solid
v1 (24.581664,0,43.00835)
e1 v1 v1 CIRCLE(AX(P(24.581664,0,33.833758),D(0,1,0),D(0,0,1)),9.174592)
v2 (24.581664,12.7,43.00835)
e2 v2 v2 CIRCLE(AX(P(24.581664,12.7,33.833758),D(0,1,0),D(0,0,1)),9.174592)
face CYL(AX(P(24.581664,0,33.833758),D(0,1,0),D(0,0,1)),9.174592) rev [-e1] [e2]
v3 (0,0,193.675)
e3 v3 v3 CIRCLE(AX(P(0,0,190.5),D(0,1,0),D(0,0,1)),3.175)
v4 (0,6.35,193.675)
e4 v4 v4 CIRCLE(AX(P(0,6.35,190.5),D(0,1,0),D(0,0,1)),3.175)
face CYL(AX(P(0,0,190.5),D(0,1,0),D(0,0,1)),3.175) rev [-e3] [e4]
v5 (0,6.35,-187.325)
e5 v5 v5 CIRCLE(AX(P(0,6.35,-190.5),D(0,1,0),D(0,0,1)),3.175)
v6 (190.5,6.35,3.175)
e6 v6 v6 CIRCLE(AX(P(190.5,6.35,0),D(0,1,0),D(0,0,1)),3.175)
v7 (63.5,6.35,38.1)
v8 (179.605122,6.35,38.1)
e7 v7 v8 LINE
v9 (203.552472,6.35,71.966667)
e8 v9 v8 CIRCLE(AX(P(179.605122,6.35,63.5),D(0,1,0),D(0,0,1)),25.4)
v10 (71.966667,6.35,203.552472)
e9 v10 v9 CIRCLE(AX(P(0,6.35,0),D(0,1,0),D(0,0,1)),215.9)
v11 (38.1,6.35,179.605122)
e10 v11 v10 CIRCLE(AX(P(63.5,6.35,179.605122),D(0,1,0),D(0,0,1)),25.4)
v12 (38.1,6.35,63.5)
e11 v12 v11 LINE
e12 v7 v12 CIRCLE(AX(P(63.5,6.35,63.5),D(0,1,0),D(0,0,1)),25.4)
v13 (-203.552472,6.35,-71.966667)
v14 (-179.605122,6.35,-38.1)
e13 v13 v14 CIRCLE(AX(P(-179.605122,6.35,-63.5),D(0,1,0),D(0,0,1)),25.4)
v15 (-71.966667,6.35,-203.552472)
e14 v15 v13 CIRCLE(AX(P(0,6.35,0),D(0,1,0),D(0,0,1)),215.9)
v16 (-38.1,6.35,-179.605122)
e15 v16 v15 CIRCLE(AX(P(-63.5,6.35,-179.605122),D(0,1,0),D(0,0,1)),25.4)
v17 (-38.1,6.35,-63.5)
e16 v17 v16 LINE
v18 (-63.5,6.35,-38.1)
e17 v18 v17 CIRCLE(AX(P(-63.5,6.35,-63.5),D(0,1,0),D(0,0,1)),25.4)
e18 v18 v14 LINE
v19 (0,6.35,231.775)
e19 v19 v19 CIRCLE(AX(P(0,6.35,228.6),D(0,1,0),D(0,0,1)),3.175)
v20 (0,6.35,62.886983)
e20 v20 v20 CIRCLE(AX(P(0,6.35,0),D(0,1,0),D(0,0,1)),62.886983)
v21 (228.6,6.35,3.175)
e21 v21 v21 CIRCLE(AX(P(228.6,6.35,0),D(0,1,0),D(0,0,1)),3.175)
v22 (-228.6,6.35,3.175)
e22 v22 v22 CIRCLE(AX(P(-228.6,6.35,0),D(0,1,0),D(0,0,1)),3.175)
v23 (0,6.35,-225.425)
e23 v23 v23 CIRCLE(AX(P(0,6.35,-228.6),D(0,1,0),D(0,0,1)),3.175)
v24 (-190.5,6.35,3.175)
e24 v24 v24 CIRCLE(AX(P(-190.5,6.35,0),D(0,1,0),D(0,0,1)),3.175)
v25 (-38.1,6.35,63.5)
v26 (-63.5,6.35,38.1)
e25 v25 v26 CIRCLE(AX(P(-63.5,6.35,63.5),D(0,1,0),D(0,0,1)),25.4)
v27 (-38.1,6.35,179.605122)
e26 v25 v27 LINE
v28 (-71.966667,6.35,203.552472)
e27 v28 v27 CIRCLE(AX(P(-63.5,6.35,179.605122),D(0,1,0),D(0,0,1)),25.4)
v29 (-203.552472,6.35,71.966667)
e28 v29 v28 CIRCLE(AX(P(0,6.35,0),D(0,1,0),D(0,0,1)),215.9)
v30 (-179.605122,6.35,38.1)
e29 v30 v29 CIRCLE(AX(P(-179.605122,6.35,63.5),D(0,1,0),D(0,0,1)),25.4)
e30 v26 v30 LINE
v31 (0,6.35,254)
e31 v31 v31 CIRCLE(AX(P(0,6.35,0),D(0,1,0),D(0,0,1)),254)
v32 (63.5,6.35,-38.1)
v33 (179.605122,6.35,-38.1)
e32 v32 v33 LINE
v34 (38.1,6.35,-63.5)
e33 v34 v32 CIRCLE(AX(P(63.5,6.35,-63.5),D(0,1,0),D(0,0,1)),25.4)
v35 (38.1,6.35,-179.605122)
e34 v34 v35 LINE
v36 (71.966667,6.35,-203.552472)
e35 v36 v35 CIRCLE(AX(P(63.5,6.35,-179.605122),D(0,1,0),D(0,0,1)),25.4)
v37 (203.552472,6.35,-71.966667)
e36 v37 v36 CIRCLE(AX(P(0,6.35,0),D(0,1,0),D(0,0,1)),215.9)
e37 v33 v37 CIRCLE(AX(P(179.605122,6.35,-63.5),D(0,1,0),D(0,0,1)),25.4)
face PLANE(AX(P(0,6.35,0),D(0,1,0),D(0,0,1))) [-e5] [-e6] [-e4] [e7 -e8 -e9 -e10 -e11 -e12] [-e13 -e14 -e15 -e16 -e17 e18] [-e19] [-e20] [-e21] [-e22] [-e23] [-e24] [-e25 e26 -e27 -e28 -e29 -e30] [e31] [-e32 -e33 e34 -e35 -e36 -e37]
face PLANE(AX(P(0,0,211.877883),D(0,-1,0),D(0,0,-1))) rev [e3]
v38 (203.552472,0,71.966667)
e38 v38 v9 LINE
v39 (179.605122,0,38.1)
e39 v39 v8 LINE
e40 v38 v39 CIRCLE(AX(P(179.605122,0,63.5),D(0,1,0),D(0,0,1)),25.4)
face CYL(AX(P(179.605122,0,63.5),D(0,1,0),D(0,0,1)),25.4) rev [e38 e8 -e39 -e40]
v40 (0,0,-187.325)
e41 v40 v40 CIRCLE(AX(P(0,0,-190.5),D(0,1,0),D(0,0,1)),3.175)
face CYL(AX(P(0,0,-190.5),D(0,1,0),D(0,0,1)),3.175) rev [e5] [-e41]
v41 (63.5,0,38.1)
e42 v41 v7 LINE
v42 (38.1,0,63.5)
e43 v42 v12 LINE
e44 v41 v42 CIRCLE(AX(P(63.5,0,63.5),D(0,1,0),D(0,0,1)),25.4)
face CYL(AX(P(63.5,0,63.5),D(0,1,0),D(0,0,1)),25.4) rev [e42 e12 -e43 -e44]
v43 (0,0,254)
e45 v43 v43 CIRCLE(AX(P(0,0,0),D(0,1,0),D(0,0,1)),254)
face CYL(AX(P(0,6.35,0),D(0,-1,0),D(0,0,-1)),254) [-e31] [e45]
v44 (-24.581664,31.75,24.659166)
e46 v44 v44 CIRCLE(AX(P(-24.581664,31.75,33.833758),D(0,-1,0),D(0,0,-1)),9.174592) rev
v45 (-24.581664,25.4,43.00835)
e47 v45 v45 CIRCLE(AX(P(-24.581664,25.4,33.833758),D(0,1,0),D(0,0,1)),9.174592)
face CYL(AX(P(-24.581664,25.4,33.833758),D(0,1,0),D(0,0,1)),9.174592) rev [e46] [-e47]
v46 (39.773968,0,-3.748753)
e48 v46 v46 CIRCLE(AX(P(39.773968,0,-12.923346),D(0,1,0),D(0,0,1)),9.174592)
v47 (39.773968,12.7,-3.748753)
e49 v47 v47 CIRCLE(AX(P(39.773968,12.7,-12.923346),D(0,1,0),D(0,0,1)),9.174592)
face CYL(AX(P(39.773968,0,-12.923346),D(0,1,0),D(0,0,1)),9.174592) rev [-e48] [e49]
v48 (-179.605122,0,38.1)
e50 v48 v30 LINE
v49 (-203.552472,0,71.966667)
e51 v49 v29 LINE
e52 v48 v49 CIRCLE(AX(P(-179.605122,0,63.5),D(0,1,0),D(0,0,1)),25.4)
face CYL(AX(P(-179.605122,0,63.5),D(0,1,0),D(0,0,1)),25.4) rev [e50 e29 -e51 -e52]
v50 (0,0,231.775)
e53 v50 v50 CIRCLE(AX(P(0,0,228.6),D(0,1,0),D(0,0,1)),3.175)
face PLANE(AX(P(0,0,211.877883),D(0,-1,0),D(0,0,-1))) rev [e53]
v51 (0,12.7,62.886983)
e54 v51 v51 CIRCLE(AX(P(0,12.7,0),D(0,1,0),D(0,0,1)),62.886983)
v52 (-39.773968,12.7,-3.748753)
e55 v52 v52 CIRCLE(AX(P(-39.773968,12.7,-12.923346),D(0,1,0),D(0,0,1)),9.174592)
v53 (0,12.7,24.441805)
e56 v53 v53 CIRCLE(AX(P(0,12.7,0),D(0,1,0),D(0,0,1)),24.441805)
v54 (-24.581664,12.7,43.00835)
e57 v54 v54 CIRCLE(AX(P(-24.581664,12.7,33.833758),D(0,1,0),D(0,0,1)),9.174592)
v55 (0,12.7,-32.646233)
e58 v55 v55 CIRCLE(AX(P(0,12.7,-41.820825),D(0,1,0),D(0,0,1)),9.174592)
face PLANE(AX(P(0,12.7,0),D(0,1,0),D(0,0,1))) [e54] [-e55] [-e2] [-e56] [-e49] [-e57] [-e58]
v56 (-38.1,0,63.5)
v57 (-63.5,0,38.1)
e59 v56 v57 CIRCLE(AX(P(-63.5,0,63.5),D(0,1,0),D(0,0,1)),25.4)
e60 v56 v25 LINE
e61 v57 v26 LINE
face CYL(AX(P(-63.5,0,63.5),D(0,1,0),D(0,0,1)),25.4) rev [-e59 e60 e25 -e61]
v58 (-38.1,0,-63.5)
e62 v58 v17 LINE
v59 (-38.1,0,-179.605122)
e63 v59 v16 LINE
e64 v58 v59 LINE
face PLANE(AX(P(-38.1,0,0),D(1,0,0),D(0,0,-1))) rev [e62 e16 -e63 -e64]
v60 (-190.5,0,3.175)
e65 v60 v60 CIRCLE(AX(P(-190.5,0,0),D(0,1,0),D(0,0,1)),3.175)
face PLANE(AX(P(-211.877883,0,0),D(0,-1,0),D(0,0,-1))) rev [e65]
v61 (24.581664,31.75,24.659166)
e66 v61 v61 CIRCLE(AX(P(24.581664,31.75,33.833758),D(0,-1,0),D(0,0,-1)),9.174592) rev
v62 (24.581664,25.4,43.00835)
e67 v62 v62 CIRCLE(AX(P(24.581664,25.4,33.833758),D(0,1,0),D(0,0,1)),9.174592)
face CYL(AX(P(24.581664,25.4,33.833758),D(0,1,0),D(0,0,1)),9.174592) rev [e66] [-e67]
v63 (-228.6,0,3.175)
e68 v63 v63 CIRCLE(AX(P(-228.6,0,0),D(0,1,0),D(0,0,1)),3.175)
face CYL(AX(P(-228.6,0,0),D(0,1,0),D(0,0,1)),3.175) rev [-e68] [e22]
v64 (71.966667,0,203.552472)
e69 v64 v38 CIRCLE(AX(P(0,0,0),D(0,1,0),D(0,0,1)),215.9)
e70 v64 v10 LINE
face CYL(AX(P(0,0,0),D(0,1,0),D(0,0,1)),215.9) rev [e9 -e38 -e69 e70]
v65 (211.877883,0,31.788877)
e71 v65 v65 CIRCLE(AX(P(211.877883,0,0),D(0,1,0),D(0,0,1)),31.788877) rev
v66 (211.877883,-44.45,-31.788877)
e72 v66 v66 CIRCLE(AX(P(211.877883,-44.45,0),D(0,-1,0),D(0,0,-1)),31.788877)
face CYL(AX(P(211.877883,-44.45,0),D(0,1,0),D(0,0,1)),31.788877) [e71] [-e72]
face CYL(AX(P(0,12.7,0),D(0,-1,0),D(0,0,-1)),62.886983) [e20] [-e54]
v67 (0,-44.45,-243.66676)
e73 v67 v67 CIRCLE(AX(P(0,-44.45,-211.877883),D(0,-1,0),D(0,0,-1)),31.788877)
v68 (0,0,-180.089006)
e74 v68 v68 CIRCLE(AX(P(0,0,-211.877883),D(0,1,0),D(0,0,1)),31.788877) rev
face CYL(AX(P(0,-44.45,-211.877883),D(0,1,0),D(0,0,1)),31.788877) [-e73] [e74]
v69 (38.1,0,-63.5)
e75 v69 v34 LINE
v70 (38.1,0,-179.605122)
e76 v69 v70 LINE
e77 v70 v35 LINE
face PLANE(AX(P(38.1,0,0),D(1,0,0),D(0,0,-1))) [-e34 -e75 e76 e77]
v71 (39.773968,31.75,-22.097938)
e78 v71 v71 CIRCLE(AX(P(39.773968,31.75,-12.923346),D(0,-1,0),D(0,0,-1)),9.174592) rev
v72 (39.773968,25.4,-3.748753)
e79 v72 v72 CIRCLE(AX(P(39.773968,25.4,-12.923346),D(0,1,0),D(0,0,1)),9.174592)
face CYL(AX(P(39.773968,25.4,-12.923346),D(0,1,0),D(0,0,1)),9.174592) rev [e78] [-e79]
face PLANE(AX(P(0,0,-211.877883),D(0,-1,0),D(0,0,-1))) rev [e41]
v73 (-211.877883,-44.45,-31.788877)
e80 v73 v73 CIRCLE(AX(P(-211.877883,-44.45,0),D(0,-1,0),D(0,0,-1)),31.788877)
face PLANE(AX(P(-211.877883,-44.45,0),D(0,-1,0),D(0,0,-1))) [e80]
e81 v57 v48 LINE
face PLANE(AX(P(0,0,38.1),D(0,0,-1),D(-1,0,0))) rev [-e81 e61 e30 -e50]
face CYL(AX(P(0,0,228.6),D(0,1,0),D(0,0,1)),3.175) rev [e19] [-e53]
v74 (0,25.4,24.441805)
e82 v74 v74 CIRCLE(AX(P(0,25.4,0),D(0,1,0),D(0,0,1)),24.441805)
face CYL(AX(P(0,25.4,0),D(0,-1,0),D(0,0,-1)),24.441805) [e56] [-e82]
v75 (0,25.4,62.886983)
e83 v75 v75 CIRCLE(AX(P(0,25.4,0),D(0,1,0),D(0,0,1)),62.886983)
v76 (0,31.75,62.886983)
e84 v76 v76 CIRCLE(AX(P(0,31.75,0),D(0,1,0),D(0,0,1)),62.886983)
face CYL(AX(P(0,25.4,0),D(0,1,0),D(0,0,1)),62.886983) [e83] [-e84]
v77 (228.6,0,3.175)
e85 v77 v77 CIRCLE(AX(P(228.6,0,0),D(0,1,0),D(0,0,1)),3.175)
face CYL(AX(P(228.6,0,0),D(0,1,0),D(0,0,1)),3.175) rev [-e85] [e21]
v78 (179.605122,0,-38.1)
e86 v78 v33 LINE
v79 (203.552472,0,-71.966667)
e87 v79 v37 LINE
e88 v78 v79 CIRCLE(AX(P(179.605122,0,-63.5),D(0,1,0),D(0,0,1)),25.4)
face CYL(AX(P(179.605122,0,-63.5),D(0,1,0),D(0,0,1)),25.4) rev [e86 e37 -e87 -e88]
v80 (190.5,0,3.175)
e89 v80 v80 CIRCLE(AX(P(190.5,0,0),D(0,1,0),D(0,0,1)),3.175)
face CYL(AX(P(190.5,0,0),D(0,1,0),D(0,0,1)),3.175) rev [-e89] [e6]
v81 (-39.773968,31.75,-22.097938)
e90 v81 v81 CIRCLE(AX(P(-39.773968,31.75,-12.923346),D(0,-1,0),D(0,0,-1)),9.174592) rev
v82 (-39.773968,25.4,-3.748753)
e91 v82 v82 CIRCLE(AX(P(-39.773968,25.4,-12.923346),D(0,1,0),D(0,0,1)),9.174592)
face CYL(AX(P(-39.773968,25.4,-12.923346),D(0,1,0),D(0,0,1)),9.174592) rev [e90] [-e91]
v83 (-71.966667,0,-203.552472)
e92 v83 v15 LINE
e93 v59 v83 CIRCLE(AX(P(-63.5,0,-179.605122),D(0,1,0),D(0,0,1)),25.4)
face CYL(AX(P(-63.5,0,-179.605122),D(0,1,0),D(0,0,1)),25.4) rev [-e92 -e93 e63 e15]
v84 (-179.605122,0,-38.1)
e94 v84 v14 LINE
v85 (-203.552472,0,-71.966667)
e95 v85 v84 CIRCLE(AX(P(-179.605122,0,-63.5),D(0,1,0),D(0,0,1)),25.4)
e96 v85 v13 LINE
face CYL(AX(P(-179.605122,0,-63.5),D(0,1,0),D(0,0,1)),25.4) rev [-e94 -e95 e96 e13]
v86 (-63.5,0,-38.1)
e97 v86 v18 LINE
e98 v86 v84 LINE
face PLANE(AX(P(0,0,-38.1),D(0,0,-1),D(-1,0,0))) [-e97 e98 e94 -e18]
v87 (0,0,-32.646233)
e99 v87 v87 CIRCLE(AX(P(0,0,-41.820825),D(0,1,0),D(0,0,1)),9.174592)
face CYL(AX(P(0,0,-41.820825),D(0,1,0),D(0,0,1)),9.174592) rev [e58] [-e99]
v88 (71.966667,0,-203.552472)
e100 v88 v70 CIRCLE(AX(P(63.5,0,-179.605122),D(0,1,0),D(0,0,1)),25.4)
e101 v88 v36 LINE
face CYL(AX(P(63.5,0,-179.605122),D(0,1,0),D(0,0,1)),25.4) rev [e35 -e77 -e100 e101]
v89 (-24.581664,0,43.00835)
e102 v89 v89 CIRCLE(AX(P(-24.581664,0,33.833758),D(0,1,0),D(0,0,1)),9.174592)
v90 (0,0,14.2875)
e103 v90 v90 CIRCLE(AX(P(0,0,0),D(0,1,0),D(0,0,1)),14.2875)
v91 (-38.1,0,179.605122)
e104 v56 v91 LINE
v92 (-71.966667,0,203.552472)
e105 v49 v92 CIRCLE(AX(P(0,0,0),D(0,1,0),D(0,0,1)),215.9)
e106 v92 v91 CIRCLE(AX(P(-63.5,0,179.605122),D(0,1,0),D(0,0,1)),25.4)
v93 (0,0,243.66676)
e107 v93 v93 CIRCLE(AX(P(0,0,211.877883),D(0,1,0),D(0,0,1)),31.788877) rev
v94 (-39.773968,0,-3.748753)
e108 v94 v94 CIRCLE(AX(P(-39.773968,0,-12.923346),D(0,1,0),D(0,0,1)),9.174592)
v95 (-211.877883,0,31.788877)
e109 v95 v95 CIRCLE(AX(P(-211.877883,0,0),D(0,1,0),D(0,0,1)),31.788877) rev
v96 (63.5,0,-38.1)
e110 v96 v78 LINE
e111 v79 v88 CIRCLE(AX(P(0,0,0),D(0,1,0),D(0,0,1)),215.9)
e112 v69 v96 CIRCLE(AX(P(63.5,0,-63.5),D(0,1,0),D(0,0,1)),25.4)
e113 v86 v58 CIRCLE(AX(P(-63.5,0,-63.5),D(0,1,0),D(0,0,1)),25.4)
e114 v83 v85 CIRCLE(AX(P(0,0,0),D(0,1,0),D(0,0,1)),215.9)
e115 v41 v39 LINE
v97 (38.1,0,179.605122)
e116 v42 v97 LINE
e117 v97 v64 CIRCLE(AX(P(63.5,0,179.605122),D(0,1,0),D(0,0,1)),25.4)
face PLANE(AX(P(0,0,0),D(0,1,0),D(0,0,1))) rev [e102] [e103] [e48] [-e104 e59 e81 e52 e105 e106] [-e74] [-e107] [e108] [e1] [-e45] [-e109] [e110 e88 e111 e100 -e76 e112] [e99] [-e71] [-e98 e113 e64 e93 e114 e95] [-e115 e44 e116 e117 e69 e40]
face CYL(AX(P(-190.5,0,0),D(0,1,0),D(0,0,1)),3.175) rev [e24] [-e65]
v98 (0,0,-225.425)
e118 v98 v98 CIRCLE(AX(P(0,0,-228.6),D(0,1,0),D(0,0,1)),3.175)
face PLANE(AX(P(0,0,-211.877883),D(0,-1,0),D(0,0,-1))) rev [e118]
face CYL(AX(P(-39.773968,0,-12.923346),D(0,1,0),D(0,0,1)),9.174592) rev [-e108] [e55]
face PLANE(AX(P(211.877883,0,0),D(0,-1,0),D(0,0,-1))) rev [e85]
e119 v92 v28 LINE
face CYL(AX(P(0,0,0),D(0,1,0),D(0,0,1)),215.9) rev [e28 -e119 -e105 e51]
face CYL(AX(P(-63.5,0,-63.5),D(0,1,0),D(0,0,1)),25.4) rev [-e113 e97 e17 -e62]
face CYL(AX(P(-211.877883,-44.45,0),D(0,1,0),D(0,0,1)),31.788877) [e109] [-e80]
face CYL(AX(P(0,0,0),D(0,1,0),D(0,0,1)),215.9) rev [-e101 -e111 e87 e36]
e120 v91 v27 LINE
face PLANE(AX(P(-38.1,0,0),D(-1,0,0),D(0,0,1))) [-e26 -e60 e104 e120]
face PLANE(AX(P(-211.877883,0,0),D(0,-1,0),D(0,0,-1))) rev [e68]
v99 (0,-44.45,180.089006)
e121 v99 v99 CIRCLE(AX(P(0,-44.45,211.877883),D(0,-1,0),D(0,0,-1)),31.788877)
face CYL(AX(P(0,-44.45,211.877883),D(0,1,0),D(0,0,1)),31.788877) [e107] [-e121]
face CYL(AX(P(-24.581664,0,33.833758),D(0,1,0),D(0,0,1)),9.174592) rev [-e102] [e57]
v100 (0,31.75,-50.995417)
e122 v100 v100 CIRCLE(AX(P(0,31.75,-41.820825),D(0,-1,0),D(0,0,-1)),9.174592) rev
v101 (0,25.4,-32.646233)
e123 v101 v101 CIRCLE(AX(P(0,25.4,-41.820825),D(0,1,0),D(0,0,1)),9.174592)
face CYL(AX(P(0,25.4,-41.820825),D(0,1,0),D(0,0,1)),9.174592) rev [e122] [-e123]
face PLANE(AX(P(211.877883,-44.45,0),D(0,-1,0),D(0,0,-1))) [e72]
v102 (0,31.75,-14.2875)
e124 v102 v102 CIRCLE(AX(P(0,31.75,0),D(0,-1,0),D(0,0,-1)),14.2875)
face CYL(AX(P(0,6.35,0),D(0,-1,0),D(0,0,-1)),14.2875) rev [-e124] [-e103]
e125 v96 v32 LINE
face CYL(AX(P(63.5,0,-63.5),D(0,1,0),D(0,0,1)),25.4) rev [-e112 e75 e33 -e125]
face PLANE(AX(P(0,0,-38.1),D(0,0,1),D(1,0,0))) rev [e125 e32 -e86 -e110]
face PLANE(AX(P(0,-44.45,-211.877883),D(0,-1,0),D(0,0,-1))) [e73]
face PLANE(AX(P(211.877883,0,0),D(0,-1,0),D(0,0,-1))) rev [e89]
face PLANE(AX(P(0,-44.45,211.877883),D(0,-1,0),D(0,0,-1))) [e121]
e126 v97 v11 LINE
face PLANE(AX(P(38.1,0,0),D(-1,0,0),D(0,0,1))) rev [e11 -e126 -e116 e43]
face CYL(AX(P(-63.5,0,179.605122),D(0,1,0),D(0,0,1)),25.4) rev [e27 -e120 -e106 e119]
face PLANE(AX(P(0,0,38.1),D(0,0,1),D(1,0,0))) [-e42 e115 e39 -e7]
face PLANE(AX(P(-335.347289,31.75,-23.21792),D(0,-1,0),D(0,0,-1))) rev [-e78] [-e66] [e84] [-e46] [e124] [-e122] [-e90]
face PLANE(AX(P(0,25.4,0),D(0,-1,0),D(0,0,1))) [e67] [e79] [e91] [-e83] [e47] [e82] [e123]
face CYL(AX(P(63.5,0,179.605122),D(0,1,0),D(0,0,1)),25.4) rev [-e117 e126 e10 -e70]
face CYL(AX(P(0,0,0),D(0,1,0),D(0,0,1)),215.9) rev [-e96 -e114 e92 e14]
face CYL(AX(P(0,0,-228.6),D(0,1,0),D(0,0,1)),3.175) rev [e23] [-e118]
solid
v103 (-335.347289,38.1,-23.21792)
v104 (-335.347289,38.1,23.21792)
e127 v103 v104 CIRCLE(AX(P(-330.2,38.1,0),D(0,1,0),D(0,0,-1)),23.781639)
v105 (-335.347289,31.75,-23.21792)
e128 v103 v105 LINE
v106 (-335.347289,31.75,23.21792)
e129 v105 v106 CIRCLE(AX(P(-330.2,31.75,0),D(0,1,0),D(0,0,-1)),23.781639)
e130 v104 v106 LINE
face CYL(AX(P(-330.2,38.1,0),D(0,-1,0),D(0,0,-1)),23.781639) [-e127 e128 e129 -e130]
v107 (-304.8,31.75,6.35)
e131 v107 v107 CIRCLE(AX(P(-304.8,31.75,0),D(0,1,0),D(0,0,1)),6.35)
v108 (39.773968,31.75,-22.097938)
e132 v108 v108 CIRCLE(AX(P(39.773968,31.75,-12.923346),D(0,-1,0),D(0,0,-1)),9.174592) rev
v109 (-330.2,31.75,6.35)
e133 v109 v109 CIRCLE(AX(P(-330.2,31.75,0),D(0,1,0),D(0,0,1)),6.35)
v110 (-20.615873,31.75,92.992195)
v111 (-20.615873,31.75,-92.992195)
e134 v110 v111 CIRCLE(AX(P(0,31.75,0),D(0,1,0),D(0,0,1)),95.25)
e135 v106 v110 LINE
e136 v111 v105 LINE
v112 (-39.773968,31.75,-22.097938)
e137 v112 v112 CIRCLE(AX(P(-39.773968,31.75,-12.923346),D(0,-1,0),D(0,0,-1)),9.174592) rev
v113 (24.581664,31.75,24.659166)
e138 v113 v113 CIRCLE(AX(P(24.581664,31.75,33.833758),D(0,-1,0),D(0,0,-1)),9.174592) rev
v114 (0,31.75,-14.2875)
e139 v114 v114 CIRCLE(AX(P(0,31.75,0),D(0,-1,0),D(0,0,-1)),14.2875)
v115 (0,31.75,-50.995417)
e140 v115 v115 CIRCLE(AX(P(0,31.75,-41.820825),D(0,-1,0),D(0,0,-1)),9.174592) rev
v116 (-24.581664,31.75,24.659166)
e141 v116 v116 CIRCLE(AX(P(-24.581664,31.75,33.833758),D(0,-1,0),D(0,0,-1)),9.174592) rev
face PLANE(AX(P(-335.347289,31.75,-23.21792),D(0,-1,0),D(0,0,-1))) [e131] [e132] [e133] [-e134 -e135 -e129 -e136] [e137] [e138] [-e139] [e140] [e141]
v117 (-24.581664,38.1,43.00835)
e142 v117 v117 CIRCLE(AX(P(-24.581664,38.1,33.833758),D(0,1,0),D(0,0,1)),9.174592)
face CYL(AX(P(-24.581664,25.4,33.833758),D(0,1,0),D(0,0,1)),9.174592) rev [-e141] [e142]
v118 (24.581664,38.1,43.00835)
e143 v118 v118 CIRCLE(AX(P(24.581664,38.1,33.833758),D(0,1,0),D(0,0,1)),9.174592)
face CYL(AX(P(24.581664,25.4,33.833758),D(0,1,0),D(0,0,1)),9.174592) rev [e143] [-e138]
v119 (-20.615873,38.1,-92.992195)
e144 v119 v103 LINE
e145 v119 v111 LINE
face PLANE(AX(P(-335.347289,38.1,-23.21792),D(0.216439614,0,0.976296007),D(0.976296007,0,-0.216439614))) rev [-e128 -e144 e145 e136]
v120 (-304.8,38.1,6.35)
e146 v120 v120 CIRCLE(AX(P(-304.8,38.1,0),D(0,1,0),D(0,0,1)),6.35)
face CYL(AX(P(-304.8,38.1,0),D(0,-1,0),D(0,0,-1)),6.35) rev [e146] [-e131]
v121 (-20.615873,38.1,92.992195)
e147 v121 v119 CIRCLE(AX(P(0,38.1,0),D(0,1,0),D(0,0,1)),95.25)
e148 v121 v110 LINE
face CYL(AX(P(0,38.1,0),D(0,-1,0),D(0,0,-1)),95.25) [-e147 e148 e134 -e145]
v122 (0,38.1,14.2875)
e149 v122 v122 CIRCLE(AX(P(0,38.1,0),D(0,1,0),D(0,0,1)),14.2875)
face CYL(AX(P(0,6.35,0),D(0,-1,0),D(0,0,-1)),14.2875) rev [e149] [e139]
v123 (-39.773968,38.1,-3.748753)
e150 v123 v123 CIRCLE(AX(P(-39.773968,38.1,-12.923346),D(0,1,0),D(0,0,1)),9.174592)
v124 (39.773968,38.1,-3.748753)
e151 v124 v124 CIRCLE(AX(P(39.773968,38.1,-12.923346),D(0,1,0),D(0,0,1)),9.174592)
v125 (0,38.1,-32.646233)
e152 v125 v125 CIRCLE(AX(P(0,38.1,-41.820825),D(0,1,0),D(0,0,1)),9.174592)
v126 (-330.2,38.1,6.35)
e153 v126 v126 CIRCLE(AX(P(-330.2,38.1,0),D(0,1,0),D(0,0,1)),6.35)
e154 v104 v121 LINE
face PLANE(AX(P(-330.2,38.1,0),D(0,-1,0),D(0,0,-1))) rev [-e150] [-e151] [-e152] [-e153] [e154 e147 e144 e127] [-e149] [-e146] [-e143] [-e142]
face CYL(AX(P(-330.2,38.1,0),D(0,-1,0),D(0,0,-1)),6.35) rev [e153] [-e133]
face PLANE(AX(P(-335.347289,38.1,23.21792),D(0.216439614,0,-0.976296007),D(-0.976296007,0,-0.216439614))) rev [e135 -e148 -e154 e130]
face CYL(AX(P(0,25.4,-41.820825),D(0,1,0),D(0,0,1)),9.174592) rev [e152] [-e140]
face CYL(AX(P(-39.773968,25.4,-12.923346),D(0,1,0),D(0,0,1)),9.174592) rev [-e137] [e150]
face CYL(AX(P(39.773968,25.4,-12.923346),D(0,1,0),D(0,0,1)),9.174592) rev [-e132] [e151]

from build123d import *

# Parameters (mm, degrees)
SKETCH2_R           = 254
SKETCH2_R_2         = 14.2875
BOSS_EXTRUDE1_DEPTH = 6.35
SKETCH3_R           = 3.175
CUT_EXTRUDE1_DEPTH  = 360.266367059
SKETCH4_R           = 9.174592155
CUT_EXTRUDE2_DEPTH  = 360.266367059
BOSS_EXTRUDE2_START = 6.35
SKETCH5_R           = 62.886983285
SKETCH5_R_2         = 14.2875
SKETCH5_R_3         = 9.174592155
BOSS_EXTRUDE2_DEPTH = 6.35
SKETCH6_R           = 24.441804507
SKETCH6_R_2         = 14.2875
BOSS_EXTRUDE3_DEPTH = 12.7
BOSS_EXTRUDE4_START = 6.35
SKETCH7_R           = 9.174592155
SKETCH7_R_2         = 14.2875
SKETCH7_R_3         = 6.35
BOSS_EXTRUDE4_DEPTH = 6.35
SKETCH9_R           = 31.78887674
BOSS_EXTRUDE5_DEPTH = 44.45


# Read off the part's stored shape, not the designer's step: Split1
with BuildPart() as part:
    # Sketch2 → Boss-Extrude1 (new body)
    with BuildSketch(Plane(origin=(0, 0, 0), x_dir=(1, 0, 0), z_dir=(0, 1, 0))):
        with Locations(Location((0, 0, 0), (0, 0, 270))):
            Circle(SKETCH2_R)
        with Locations(Location((0, 0, 0), (0, 0, 270))):
            Circle(SKETCH2_R_2, mode=Mode.SUBTRACT)
    extrude(amount=BOSS_EXTRUDE1_DEPTH)

    # Sketch3 → Cut-Extrude1 (cut, through all)
    with BuildSketch(Plane(origin=(0, 6.35, 0), x_dir=(1, 0, 0), z_dir=(0, 1, 0))):
        with BuildLine():
            Line((-63.5, -38.1), (-179.605122421, -38.1))
            ThreePointArc((-179.605122421, -38.1), (-200.344135577, -48.835303163), (-203.552472078, -71.966666667))
            ThreePointArc((-203.552472078, -71.966666667), (-152.664354058, -152.664354058), (-71.966666667, -203.552472078))
            ThreePointArc((-71.966666667, -203.552472078), (-48.835303163, -200.344135577), (-38.1, -179.605122421))
            Line((-38.1, -179.605122421), (-38.1, -63.5))
            ThreePointArc((-38.1, -63.5), (-45.539487758, -45.539487758), (-63.5, -38.1))
        make_face()
        with BuildLine():
            ThreePointArc((-71.966666667, 203.552472078), (-152.664354058, 152.664354058), (-203.552472078, 71.966666667))
            ThreePointArc((-203.552472078, 71.966666667), (-200.344135577, 48.835303163), (-179.605122421, 38.1))
            Line((-179.605122421, 38.1), (-63.5, 38.1))
            ThreePointArc((-63.5, 38.1), (-45.539487758, 45.539487758), (-38.1, 63.5))
            Line((-38.1, 63.5), (-38.1, 179.605122421))
            ThreePointArc((-38.1, 179.605122421), (-48.835303163, 200.344135577), (-71.966666667, 203.552472078))
        make_face()
        with BuildLine():
            ThreePointArc((71.966666667, -203.552472078), (152.664354058, -152.664354058), (203.552472078, -71.966666667))
            ThreePointArc((203.552472078, -71.966666667), (200.344135577, -48.835303163), (179.605122421, -38.1))
            Line((179.605122421, -38.1), (63.5, -38.1))
            ThreePointArc((63.5, -38.1), (45.539487758, -45.539487758), (38.1, -63.5))
            Line((38.1, -63.5), (38.1, -179.605122421))
            ThreePointArc((38.1, -179.605122421), (48.835303163, -200.344135577), (71.966666667, -203.552472078))
        make_face()
        with BuildLine():
            ThreePointArc((203.552472078, 71.966666667), (152.664354058, 152.664354058), (71.966666667, 203.552472078))
            ThreePointArc((71.966666667, 203.552472078), (48.835303163, 200.344135577), (38.1, 179.605122421))
            Line((38.1, 179.605122421), (38.1, 63.5))
            ThreePointArc((38.1, 63.5), (45.539487758, 45.539487758), (63.5, 38.1))
            Line((63.5, 38.1), (179.605122421, 38.1))
            ThreePointArc((179.605122421, 38.1), (200.344135577, 48.835303163), (203.552472078, 71.966666667))
        make_face()
        with Locations(Location((-190.5, 0, 0), (0, 0, 270))):
            Circle(SKETCH3_R)
        with Locations(Location((-228.6, 0, 0), (0, 0, 270))):
            Circle(SKETCH3_R)
        with Locations(Location((0, -228.6, 0), (0, 0, 270))):
            Circle(SKETCH3_R)
        with Locations(Location((0, -190.5, 0), (0, 0, 270))):
            Circle(SKETCH3_R)
        with Locations(Location((190.5, 0, 0), (0, 0, 270))):
            Circle(SKETCH3_R)
        with Locations(Location((228.6, 0, 0), (0, 0, 270))):
            Circle(SKETCH3_R)
        with Locations(Location((0, 228.6, 0), (0, 0, 270))):
            Circle(SKETCH3_R)
        with Locations(Location((0, 190.5, 0), (0, 0, 270))):
            Circle(SKETCH3_R)
    extrude(amount=-CUT_EXTRUDE1_DEPTH, mode=Mode.SUBTRACT)

    # Sketch4 → Cut-Extrude2 (cut, through all)
    with BuildSketch(Plane(origin=(0, 6.35, 0), x_dir=(1, 0, 0), z_dir=(0, 1, 0))):
        with Locations(Location((0, 41.820824684, 0), (0, 0, 270))):
            Circle(SKETCH4_R)
        with Locations(Location((39.773967832, 12.923345546, 0), (0, 0, 270))):
            Circle(SKETCH4_R)
        with Locations(Location((24.581663988, -33.833757888, 0), (0, 0, 270))):
            Circle(SKETCH4_R)
        with Locations(Location((-24.581663988, -33.833757888, 0), (0, 0, 270))):
            Circle(SKETCH4_R)
        with Locations(Location((-39.773967832, 12.923345546, 0), (0, 0, 270))):
            Circle(SKETCH4_R)
    extrude(amount=-CUT_EXTRUDE2_DEPTH, mode=Mode.SUBTRACT)

    # Sketch5 → Boss-Extrude2 (add)
    with BuildSketch(Plane(origin=(0, 6.35, 0), x_dir=(1, 0, 0), z_dir=(0, 1, 0)).offset(BOSS_EXTRUDE2_START)):
        with Locations(Location((0, 0, 0), (0, 0, 270))):
            Circle(SKETCH5_R)
        with Locations(Location((0, 0, 0), (0, 0, 270))):
            Circle(SKETCH5_R_2, mode=Mode.SUBTRACT)
        with Locations(Location((24.581663988, -33.833757888, 0), (0, 0, 270))):
            Circle(SKETCH5_R_3, mode=Mode.SUBTRACT)
        with Locations(Location((39.773967832, 12.923345546, 0), (0, 0, 270))):
            Circle(SKETCH5_R_3, mode=Mode.SUBTRACT)
        with Locations(Location((0, 41.820824684, 0), (0, 0, 270))):
            Circle(SKETCH5_R_3, mode=Mode.SUBTRACT)
        with Locations(Location((-39.773967832, 12.923345546, 0), (0, 0, 270))):
            Circle(SKETCH5_R_3, mode=Mode.SUBTRACT)
        with Locations(Location((-24.581663988, -33.833757888, 0), (0, 0, 270))):
            Circle(SKETCH5_R_3, mode=Mode.SUBTRACT)
    boss_extrude2 = extrude(amount=-BOSS_EXTRUDE2_DEPTH)

    # Sketch6 → Boss-Extrude3 (add)
    with BuildSketch(Plane(origin=(0, 12.7, 0), x_dir=(1, 0, 0), z_dir=(0, 1, 0))):
        with Locations(Location((0, 0, 0), (0, 0, 270))):
            Circle(SKETCH6_R)
        with Locations(Location((0, 0, 0), (0, 0, 270))):
            Circle(SKETCH6_R_2, mode=Mode.SUBTRACT)
    extrude(amount=BOSS_EXTRUDE3_DEPTH)

    # Mirror1: Boss-Extrude2 across plane
    add(boss_extrude2.mirror(Plane.ZX.offset(19.05)))

    # Sketch7 → Boss-Extrude4 (add)
    with BuildSketch(Plane(origin=(0, 31.75, 0), x_dir=(1, 0, 0), z_dir=(0, 1, 0)).offset(BOSS_EXTRUDE4_START)):
        with BuildLine():
            Line((-335.347288867, 23.217919665), (-20.615873228, 92.992194678))
            ThreePointArc((-20.615873228, 92.992194678), (95.25, 0), (-20.615873228, -92.992194678))
            Line((-20.615873228, -92.992194678), (-335.347288867, -23.217919665))
            ThreePointArc((-335.347288867, -23.217919665), (-353.981639478, 0), (-335.347288867, 23.217919665))
        make_face()
        with Locations(Location((24.581663988, -33.833757888, 0), (0, 0, 270))):
            Circle(SKETCH7_R, mode=Mode.SUBTRACT)
        with Locations(Location((0, 0, 0), (0, 0, 270))):
            Circle(SKETCH7_R_2, mode=Mode.SUBTRACT)
        with Locations(Location((39.773967832, 12.923345546, 0), (0, 0, 270))):
            Circle(SKETCH7_R, mode=Mode.SUBTRACT)
        with Locations(Location((0, 41.820824684, 0), (0, 0, 270))):
            Circle(SKETCH7_R, mode=Mode.SUBTRACT)
        with Locations(Location((-39.773967832, 12.923345546, 0), (0, 0, 270))):
            Circle(SKETCH7_R, mode=Mode.SUBTRACT)
        with Locations(Location((-24.581663988, -33.833757888, 0), (0, 0, 270))):
            Circle(SKETCH7_R, mode=Mode.SUBTRACT)
        with Locations(Location((-330.2, 0, 0), (0, 0, 270))):
            Circle(SKETCH7_R_3, mode=Mode.SUBTRACT)
        with Locations(Location((-304.8, 0, 0), (0, 0, 270))):
            Circle(SKETCH7_R_3, mode=Mode.SUBTRACT)
    extrude(amount=-BOSS_EXTRUDE4_DEPTH)

    # Sketch9 → Boss-Extrude5 (add)
    with BuildSketch(Plane.XZ):
        with Locations(Location((-211.87788303, 0, 0), (0, 0, 90))):
            Circle(SKETCH9_R)
        with Locations(Location((0, 211.87788303, 0), (0, 0, 90))):
            Circle(SKETCH9_R)
        with Locations(Location((211.87788303, 0, 0), (0, 0, 90))):
            Circle(SKETCH9_R)
        with Locations(Location((0, -211.87788303, 0), (0, 0, 90))):
            Circle(SKETCH9_R)
    extrude(amount=BOSS_EXTRUDE5_DEPTH)


with BuildPart() as body_2:
    # Split1: the piece on the far side of the plane
    add(part.part)
    split(bisect_by=Plane(origin=(0, 31.75, 0), x_dir=(1, 0, 0), z_dir=(0, 1, 0)), keep=Keep.BOTTOM)


with BuildPart() as part_1:
    add(part.part)

    # Split1
    split(bisect_by=Plane(origin=(0, 31.75, 0), x_dir=(1, 0, 0), z_dir=(0, 1, 0)), keep=Keep.TOP)


solid = Compound([body_2.part, part_1.part])
